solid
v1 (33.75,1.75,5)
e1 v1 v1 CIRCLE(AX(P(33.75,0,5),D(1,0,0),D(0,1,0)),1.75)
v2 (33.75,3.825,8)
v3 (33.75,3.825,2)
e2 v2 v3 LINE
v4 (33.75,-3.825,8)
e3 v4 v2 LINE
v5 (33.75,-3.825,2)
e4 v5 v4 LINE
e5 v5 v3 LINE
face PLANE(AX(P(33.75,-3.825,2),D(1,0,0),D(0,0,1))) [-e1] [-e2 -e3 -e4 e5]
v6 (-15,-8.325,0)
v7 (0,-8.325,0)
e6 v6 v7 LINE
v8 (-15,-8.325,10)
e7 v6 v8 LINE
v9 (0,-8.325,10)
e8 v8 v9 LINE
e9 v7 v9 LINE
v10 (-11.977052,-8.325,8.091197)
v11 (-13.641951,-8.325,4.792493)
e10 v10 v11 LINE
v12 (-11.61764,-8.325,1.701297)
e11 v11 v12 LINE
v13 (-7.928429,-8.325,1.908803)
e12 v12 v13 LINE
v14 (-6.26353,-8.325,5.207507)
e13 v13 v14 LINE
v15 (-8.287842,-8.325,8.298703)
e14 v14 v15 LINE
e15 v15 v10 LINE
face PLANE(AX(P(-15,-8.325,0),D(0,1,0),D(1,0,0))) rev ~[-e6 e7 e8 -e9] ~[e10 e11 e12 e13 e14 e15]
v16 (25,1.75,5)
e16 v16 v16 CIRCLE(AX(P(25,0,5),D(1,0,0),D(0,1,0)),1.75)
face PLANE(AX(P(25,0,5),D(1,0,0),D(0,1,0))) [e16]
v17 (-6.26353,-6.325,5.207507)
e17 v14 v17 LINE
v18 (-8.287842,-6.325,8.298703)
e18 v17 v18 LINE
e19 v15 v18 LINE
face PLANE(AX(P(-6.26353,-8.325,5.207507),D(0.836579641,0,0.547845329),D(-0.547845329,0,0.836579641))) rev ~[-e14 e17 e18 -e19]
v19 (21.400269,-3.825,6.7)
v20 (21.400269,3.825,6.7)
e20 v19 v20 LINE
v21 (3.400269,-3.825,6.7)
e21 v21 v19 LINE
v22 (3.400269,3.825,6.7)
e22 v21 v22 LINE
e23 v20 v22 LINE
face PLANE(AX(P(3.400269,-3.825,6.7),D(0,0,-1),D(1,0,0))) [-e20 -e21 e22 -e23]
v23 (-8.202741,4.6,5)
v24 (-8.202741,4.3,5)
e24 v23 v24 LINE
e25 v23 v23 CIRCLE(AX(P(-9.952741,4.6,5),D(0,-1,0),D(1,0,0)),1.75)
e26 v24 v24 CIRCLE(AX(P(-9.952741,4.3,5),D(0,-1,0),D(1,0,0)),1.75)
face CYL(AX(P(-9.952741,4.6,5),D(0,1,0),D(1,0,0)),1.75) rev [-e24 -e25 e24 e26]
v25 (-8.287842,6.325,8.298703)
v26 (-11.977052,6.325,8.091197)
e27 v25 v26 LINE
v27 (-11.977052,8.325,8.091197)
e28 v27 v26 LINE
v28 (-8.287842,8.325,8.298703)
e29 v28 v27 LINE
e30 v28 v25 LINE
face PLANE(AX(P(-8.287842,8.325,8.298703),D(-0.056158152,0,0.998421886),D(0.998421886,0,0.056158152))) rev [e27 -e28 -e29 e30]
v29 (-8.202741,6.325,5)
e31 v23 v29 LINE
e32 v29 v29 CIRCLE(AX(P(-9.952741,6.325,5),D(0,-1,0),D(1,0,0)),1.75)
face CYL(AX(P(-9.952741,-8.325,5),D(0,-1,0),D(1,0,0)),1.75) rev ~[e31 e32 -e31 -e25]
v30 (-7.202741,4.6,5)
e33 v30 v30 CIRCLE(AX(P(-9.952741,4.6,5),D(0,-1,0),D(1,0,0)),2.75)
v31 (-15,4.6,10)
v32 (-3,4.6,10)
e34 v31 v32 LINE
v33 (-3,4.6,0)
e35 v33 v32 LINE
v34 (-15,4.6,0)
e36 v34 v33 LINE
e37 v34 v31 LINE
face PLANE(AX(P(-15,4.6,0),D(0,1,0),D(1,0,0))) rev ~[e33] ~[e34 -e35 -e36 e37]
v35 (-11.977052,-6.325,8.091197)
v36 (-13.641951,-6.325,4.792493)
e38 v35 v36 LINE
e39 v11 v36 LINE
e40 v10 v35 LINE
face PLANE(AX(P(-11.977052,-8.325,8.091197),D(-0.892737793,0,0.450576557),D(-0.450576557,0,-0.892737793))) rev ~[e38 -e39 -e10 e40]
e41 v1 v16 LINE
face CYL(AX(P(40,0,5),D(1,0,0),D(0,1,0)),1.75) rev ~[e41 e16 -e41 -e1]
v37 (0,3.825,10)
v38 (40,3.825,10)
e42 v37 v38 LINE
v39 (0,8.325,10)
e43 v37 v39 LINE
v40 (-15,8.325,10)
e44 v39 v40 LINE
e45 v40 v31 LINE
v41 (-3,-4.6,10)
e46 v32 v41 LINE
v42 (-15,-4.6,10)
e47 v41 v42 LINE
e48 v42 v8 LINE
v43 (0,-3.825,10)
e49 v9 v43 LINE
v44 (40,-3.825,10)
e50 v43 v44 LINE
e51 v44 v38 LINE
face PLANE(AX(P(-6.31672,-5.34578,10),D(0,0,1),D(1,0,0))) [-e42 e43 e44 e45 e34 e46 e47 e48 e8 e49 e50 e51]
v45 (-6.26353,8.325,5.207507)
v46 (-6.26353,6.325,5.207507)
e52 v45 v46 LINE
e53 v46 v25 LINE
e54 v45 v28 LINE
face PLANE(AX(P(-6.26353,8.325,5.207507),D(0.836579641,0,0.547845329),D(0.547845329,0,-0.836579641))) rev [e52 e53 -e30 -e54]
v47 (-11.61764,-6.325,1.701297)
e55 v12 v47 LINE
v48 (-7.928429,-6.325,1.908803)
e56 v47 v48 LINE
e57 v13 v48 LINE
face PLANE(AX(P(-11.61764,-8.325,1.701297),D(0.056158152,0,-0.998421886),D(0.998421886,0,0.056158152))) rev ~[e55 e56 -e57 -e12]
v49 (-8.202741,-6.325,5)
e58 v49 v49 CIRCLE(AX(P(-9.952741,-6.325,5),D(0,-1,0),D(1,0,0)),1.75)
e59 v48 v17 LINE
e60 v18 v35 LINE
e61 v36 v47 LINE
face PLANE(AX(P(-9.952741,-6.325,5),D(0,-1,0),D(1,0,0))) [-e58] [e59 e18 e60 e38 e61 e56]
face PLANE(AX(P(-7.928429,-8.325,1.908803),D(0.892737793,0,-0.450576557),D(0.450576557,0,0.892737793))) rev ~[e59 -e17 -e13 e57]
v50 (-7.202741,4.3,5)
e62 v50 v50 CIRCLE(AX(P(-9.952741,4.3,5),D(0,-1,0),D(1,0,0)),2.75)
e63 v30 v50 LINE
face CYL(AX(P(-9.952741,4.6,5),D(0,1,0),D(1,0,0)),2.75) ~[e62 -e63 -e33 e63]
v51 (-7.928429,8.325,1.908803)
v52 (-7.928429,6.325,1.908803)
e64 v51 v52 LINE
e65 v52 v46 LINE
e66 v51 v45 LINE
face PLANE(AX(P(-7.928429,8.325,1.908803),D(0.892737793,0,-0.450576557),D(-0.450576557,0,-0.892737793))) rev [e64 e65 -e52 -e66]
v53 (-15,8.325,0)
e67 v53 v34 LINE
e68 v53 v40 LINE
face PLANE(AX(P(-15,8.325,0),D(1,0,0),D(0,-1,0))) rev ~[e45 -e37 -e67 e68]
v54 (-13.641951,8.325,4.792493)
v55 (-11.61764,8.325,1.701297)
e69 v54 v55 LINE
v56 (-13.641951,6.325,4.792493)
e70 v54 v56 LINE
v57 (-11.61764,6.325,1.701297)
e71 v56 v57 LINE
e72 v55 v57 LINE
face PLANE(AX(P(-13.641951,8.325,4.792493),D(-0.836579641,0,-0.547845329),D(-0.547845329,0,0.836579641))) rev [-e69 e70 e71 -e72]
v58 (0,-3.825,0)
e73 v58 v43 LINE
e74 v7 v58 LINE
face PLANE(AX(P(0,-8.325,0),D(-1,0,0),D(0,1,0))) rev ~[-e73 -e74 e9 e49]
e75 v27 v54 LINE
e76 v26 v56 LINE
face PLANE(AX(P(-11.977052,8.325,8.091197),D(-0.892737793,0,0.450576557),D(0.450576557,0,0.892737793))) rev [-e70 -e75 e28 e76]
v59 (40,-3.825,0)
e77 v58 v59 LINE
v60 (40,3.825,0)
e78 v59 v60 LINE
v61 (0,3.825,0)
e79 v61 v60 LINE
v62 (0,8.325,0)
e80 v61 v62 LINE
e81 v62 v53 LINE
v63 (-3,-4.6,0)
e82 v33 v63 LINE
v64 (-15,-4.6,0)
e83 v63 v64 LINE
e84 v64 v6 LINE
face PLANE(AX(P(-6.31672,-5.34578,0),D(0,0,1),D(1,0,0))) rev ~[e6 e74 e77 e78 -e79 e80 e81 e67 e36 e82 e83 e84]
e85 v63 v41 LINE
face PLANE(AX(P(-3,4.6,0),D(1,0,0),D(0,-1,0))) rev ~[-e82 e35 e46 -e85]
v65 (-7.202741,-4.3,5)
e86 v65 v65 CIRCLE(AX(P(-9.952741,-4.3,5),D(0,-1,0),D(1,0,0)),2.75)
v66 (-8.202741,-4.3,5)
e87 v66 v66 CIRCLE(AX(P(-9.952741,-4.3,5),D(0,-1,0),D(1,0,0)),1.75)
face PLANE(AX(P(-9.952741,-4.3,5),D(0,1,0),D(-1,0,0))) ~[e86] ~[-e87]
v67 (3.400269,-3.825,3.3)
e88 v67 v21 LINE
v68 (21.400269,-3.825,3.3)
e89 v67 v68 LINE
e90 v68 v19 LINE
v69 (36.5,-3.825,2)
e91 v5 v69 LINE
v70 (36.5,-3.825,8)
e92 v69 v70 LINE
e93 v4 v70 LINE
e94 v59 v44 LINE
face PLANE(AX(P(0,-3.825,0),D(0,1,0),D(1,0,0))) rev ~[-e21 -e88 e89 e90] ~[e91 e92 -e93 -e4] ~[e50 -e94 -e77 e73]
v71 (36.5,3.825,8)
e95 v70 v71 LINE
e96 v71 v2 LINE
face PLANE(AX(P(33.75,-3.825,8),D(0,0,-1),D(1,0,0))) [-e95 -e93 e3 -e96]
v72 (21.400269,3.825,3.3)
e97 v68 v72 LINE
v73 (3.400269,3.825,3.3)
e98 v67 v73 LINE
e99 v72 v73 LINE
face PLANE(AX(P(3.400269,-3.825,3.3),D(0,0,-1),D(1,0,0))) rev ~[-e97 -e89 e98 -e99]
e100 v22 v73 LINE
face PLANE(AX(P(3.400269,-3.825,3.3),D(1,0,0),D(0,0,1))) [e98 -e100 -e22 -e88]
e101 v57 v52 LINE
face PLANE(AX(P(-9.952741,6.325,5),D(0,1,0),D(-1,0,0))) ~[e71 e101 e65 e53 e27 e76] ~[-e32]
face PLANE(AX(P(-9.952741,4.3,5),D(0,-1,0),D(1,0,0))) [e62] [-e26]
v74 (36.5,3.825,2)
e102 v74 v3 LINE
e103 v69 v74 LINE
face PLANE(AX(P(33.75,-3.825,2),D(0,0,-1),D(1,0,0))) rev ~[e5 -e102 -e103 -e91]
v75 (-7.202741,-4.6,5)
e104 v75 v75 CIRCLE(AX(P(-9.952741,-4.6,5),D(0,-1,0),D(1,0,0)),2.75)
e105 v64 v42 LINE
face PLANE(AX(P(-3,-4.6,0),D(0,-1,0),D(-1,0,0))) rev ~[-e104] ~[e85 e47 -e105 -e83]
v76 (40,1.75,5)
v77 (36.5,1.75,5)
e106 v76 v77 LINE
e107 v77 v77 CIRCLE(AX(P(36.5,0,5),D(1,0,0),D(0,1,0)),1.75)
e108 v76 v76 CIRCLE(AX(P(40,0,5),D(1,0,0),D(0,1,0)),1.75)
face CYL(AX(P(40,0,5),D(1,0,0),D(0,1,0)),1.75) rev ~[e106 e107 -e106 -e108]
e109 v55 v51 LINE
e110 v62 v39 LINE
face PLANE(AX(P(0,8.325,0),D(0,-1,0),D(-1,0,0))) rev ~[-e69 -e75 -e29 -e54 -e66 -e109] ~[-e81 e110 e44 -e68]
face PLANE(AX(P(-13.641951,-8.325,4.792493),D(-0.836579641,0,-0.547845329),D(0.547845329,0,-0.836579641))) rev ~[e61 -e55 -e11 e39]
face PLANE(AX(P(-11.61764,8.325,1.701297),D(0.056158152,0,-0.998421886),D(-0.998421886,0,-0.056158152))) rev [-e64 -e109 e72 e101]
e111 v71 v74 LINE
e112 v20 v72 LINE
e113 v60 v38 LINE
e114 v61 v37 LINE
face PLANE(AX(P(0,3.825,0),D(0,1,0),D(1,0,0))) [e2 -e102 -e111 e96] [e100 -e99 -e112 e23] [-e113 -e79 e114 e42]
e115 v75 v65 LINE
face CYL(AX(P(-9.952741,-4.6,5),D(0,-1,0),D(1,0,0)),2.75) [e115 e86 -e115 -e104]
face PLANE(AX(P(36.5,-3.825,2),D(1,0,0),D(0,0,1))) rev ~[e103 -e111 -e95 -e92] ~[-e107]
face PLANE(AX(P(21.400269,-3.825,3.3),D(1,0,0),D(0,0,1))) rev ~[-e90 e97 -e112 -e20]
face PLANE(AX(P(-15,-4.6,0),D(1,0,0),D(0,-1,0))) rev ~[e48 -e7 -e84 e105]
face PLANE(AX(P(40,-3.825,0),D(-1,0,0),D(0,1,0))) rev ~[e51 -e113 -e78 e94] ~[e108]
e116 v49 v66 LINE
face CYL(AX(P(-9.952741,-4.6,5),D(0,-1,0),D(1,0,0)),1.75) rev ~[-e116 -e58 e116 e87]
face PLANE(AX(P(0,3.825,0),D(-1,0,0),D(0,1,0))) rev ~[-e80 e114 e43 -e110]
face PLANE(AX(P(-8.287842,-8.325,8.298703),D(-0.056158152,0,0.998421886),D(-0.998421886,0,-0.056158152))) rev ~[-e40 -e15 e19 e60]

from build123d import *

# Parameters (mm, degrees)
F0_W      = 40
F0_H      = 3.825
F1_DEPTH  = 10
F2_R      = 1.75
F3_DEPTH  = 16.651
F4_W      = 18
F4_H      = 3.4
F4_W_2    = 2.75
F4_H_2    = 6
F5_DEPTH  = 12.151
F6_R      = 1.75
F7_DEPTH  = 15
F10_DEPTH = 2
F11_W     = 17.65
F11_H     = 60
F12_DEPTH = 8
F13_R     = 1.75
F14_DEPTH = 70.001
F15_R     = 2.75
F15_R_2   = 1.75
F16_DEPTH = 0.3
F17_R     = 1.75
F18_DEPTH = 2
F19_R     = 3.75
F20_DEPTH = 1


# Not quite as in the source:
# - a pattern or mirror of a feature is missing from the dataset's text; its kind, count and spacing are read off the source's solid


with BuildPart() as f1:
    # F0 (on Top) → F1 (new body)
    with BuildSketch(Plane.XY):
        Polygon((0, -3.825), (0, 0), (-3, 0), (-3, -4.6), (-15, -4.6), (-15, -8.325), (0, -8.325), align=None)
        Polygon((-3, 0), (0, 0), (0, 3.825), (0, 8.325), (-15, 8.325), (-15, 4.6), (-3, 4.6), align=None)
        with Locations((20, 1.9125)):
            Rectangle(F0_W, F0_H)
        with Locations((20, -1.9125)):
            Rectangle(F0_W, F0_H)
    extrude(amount=F1_DEPTH)

    # F2 (on face) → F3 (cut, through all)
    with BuildSketch(Plane.XZ.offset(8.325)):
        with Locations((-9.9527407438, 5)):
            Circle(F2_R)
    extrude(amount=-F3_DEPTH, mode=Mode.SUBTRACT)

    # F4 (on face) → F5 (cut, through all)
    with BuildSketch(Plane.XZ.offset(3.825)):
        with Locations((12.4002694301, 5)):
            Rectangle(F4_W, F4_H)
        with Locations((35.125, 5)):
            Rectangle(F4_W_2, F4_H_2)
    extrude(amount=-F5_DEPTH, mode=Mode.SUBTRACT)

    # F6 (on face) → F7 (cut)
    with BuildSketch(Plane.YZ.offset(40)):
        with Locations((0, 5)):
            Circle(F6_R)
    extrude(amount=-F7_DEPTH, mode=Mode.SUBTRACT)

    # F15 (on face) → F16 (join)
    with BuildSketch(Plane.XZ.offset(-4.6)):
        with Locations((-9.9527407438, 5)):
            Circle(F15_R)
        with Locations((-9.9527407438, 5)):
            Circle(F15_R_2, mode=Mode.SUBTRACT)
    f16 = extrude(amount=F16_DEPTH)

    # F16_copies: F16 across plane
    add(f16.mirror(Plane(origin=(0, 0, 0), x_dir=(0, 0, -1), z_dir=(0, -1, 0))))

    # F17 (on face) → F18 (cut)
    with BuildSketch(Plane.XZ.offset(8.325)):
        Polygon((-7.9284293953, 1.9088033227), (-6.2635302189, 5.2075067143), (-8.2878415673, 8.2987033916), (-11.9770520922, 8.0911966773), (-13.6419512686, 4.7924932857), (-11.6176399202, 1.7012966084), align=None)
        with Locations((-9.9527407438, 5)):
            Circle(F17_R, mode=Mode.SUBTRACT)
    f18 = extrude(amount=-F18_DEPTH, mode=Mode.SUBTRACT)

    # F18_copies: F18 across plane
    add(f18.mirror(Plane.ZX), mode=Mode.SUBTRACT)


with BuildPart() as f10:
    # F9 (on offset) → F10 (new body)
    with BuildSketch(Plane.YZ.offset(45)):
        Polygon((3.825, 0), (3.825, 10), (3.825, 19.8484882712), (-3.825, 19.8484882712), (-3.825, 10), (-3.825, 0), (-3.825, -10.1515117288), (3.825, -10.1515117288), align=None)
    extrude(amount=F10_DEPTH)

    # F11 (on face) → F12 (join)
    with BuildSketch(Plane.YZ.offset(47)):
        with Locations((0, 4.8484882712)):
            Rectangle(F11_W, F11_H)
    extrude(amount=F12_DEPTH)

    # F13 (on face) → F14 (cut, through all)
    with BuildSketch(Plane.YZ.offset(55)):
        with Locations((0, 5)):
            Circle(F13_R)
    extrude(amount=-F14_DEPTH, mode=Mode.SUBTRACT)

    # F19 (on face) → F20 (join)
    with BuildSketch(Plane(origin=(47, 0, 0), x_dir=(0, -1, 0), z_dir=(-1, 0, 0))):
        with Locations((0, -18)):
            Circle(F19_R)
        with Locations((0, 28)):
            Circle(F19_R)
    extrude(amount=F20_DEPTH)


solid = f1.part
